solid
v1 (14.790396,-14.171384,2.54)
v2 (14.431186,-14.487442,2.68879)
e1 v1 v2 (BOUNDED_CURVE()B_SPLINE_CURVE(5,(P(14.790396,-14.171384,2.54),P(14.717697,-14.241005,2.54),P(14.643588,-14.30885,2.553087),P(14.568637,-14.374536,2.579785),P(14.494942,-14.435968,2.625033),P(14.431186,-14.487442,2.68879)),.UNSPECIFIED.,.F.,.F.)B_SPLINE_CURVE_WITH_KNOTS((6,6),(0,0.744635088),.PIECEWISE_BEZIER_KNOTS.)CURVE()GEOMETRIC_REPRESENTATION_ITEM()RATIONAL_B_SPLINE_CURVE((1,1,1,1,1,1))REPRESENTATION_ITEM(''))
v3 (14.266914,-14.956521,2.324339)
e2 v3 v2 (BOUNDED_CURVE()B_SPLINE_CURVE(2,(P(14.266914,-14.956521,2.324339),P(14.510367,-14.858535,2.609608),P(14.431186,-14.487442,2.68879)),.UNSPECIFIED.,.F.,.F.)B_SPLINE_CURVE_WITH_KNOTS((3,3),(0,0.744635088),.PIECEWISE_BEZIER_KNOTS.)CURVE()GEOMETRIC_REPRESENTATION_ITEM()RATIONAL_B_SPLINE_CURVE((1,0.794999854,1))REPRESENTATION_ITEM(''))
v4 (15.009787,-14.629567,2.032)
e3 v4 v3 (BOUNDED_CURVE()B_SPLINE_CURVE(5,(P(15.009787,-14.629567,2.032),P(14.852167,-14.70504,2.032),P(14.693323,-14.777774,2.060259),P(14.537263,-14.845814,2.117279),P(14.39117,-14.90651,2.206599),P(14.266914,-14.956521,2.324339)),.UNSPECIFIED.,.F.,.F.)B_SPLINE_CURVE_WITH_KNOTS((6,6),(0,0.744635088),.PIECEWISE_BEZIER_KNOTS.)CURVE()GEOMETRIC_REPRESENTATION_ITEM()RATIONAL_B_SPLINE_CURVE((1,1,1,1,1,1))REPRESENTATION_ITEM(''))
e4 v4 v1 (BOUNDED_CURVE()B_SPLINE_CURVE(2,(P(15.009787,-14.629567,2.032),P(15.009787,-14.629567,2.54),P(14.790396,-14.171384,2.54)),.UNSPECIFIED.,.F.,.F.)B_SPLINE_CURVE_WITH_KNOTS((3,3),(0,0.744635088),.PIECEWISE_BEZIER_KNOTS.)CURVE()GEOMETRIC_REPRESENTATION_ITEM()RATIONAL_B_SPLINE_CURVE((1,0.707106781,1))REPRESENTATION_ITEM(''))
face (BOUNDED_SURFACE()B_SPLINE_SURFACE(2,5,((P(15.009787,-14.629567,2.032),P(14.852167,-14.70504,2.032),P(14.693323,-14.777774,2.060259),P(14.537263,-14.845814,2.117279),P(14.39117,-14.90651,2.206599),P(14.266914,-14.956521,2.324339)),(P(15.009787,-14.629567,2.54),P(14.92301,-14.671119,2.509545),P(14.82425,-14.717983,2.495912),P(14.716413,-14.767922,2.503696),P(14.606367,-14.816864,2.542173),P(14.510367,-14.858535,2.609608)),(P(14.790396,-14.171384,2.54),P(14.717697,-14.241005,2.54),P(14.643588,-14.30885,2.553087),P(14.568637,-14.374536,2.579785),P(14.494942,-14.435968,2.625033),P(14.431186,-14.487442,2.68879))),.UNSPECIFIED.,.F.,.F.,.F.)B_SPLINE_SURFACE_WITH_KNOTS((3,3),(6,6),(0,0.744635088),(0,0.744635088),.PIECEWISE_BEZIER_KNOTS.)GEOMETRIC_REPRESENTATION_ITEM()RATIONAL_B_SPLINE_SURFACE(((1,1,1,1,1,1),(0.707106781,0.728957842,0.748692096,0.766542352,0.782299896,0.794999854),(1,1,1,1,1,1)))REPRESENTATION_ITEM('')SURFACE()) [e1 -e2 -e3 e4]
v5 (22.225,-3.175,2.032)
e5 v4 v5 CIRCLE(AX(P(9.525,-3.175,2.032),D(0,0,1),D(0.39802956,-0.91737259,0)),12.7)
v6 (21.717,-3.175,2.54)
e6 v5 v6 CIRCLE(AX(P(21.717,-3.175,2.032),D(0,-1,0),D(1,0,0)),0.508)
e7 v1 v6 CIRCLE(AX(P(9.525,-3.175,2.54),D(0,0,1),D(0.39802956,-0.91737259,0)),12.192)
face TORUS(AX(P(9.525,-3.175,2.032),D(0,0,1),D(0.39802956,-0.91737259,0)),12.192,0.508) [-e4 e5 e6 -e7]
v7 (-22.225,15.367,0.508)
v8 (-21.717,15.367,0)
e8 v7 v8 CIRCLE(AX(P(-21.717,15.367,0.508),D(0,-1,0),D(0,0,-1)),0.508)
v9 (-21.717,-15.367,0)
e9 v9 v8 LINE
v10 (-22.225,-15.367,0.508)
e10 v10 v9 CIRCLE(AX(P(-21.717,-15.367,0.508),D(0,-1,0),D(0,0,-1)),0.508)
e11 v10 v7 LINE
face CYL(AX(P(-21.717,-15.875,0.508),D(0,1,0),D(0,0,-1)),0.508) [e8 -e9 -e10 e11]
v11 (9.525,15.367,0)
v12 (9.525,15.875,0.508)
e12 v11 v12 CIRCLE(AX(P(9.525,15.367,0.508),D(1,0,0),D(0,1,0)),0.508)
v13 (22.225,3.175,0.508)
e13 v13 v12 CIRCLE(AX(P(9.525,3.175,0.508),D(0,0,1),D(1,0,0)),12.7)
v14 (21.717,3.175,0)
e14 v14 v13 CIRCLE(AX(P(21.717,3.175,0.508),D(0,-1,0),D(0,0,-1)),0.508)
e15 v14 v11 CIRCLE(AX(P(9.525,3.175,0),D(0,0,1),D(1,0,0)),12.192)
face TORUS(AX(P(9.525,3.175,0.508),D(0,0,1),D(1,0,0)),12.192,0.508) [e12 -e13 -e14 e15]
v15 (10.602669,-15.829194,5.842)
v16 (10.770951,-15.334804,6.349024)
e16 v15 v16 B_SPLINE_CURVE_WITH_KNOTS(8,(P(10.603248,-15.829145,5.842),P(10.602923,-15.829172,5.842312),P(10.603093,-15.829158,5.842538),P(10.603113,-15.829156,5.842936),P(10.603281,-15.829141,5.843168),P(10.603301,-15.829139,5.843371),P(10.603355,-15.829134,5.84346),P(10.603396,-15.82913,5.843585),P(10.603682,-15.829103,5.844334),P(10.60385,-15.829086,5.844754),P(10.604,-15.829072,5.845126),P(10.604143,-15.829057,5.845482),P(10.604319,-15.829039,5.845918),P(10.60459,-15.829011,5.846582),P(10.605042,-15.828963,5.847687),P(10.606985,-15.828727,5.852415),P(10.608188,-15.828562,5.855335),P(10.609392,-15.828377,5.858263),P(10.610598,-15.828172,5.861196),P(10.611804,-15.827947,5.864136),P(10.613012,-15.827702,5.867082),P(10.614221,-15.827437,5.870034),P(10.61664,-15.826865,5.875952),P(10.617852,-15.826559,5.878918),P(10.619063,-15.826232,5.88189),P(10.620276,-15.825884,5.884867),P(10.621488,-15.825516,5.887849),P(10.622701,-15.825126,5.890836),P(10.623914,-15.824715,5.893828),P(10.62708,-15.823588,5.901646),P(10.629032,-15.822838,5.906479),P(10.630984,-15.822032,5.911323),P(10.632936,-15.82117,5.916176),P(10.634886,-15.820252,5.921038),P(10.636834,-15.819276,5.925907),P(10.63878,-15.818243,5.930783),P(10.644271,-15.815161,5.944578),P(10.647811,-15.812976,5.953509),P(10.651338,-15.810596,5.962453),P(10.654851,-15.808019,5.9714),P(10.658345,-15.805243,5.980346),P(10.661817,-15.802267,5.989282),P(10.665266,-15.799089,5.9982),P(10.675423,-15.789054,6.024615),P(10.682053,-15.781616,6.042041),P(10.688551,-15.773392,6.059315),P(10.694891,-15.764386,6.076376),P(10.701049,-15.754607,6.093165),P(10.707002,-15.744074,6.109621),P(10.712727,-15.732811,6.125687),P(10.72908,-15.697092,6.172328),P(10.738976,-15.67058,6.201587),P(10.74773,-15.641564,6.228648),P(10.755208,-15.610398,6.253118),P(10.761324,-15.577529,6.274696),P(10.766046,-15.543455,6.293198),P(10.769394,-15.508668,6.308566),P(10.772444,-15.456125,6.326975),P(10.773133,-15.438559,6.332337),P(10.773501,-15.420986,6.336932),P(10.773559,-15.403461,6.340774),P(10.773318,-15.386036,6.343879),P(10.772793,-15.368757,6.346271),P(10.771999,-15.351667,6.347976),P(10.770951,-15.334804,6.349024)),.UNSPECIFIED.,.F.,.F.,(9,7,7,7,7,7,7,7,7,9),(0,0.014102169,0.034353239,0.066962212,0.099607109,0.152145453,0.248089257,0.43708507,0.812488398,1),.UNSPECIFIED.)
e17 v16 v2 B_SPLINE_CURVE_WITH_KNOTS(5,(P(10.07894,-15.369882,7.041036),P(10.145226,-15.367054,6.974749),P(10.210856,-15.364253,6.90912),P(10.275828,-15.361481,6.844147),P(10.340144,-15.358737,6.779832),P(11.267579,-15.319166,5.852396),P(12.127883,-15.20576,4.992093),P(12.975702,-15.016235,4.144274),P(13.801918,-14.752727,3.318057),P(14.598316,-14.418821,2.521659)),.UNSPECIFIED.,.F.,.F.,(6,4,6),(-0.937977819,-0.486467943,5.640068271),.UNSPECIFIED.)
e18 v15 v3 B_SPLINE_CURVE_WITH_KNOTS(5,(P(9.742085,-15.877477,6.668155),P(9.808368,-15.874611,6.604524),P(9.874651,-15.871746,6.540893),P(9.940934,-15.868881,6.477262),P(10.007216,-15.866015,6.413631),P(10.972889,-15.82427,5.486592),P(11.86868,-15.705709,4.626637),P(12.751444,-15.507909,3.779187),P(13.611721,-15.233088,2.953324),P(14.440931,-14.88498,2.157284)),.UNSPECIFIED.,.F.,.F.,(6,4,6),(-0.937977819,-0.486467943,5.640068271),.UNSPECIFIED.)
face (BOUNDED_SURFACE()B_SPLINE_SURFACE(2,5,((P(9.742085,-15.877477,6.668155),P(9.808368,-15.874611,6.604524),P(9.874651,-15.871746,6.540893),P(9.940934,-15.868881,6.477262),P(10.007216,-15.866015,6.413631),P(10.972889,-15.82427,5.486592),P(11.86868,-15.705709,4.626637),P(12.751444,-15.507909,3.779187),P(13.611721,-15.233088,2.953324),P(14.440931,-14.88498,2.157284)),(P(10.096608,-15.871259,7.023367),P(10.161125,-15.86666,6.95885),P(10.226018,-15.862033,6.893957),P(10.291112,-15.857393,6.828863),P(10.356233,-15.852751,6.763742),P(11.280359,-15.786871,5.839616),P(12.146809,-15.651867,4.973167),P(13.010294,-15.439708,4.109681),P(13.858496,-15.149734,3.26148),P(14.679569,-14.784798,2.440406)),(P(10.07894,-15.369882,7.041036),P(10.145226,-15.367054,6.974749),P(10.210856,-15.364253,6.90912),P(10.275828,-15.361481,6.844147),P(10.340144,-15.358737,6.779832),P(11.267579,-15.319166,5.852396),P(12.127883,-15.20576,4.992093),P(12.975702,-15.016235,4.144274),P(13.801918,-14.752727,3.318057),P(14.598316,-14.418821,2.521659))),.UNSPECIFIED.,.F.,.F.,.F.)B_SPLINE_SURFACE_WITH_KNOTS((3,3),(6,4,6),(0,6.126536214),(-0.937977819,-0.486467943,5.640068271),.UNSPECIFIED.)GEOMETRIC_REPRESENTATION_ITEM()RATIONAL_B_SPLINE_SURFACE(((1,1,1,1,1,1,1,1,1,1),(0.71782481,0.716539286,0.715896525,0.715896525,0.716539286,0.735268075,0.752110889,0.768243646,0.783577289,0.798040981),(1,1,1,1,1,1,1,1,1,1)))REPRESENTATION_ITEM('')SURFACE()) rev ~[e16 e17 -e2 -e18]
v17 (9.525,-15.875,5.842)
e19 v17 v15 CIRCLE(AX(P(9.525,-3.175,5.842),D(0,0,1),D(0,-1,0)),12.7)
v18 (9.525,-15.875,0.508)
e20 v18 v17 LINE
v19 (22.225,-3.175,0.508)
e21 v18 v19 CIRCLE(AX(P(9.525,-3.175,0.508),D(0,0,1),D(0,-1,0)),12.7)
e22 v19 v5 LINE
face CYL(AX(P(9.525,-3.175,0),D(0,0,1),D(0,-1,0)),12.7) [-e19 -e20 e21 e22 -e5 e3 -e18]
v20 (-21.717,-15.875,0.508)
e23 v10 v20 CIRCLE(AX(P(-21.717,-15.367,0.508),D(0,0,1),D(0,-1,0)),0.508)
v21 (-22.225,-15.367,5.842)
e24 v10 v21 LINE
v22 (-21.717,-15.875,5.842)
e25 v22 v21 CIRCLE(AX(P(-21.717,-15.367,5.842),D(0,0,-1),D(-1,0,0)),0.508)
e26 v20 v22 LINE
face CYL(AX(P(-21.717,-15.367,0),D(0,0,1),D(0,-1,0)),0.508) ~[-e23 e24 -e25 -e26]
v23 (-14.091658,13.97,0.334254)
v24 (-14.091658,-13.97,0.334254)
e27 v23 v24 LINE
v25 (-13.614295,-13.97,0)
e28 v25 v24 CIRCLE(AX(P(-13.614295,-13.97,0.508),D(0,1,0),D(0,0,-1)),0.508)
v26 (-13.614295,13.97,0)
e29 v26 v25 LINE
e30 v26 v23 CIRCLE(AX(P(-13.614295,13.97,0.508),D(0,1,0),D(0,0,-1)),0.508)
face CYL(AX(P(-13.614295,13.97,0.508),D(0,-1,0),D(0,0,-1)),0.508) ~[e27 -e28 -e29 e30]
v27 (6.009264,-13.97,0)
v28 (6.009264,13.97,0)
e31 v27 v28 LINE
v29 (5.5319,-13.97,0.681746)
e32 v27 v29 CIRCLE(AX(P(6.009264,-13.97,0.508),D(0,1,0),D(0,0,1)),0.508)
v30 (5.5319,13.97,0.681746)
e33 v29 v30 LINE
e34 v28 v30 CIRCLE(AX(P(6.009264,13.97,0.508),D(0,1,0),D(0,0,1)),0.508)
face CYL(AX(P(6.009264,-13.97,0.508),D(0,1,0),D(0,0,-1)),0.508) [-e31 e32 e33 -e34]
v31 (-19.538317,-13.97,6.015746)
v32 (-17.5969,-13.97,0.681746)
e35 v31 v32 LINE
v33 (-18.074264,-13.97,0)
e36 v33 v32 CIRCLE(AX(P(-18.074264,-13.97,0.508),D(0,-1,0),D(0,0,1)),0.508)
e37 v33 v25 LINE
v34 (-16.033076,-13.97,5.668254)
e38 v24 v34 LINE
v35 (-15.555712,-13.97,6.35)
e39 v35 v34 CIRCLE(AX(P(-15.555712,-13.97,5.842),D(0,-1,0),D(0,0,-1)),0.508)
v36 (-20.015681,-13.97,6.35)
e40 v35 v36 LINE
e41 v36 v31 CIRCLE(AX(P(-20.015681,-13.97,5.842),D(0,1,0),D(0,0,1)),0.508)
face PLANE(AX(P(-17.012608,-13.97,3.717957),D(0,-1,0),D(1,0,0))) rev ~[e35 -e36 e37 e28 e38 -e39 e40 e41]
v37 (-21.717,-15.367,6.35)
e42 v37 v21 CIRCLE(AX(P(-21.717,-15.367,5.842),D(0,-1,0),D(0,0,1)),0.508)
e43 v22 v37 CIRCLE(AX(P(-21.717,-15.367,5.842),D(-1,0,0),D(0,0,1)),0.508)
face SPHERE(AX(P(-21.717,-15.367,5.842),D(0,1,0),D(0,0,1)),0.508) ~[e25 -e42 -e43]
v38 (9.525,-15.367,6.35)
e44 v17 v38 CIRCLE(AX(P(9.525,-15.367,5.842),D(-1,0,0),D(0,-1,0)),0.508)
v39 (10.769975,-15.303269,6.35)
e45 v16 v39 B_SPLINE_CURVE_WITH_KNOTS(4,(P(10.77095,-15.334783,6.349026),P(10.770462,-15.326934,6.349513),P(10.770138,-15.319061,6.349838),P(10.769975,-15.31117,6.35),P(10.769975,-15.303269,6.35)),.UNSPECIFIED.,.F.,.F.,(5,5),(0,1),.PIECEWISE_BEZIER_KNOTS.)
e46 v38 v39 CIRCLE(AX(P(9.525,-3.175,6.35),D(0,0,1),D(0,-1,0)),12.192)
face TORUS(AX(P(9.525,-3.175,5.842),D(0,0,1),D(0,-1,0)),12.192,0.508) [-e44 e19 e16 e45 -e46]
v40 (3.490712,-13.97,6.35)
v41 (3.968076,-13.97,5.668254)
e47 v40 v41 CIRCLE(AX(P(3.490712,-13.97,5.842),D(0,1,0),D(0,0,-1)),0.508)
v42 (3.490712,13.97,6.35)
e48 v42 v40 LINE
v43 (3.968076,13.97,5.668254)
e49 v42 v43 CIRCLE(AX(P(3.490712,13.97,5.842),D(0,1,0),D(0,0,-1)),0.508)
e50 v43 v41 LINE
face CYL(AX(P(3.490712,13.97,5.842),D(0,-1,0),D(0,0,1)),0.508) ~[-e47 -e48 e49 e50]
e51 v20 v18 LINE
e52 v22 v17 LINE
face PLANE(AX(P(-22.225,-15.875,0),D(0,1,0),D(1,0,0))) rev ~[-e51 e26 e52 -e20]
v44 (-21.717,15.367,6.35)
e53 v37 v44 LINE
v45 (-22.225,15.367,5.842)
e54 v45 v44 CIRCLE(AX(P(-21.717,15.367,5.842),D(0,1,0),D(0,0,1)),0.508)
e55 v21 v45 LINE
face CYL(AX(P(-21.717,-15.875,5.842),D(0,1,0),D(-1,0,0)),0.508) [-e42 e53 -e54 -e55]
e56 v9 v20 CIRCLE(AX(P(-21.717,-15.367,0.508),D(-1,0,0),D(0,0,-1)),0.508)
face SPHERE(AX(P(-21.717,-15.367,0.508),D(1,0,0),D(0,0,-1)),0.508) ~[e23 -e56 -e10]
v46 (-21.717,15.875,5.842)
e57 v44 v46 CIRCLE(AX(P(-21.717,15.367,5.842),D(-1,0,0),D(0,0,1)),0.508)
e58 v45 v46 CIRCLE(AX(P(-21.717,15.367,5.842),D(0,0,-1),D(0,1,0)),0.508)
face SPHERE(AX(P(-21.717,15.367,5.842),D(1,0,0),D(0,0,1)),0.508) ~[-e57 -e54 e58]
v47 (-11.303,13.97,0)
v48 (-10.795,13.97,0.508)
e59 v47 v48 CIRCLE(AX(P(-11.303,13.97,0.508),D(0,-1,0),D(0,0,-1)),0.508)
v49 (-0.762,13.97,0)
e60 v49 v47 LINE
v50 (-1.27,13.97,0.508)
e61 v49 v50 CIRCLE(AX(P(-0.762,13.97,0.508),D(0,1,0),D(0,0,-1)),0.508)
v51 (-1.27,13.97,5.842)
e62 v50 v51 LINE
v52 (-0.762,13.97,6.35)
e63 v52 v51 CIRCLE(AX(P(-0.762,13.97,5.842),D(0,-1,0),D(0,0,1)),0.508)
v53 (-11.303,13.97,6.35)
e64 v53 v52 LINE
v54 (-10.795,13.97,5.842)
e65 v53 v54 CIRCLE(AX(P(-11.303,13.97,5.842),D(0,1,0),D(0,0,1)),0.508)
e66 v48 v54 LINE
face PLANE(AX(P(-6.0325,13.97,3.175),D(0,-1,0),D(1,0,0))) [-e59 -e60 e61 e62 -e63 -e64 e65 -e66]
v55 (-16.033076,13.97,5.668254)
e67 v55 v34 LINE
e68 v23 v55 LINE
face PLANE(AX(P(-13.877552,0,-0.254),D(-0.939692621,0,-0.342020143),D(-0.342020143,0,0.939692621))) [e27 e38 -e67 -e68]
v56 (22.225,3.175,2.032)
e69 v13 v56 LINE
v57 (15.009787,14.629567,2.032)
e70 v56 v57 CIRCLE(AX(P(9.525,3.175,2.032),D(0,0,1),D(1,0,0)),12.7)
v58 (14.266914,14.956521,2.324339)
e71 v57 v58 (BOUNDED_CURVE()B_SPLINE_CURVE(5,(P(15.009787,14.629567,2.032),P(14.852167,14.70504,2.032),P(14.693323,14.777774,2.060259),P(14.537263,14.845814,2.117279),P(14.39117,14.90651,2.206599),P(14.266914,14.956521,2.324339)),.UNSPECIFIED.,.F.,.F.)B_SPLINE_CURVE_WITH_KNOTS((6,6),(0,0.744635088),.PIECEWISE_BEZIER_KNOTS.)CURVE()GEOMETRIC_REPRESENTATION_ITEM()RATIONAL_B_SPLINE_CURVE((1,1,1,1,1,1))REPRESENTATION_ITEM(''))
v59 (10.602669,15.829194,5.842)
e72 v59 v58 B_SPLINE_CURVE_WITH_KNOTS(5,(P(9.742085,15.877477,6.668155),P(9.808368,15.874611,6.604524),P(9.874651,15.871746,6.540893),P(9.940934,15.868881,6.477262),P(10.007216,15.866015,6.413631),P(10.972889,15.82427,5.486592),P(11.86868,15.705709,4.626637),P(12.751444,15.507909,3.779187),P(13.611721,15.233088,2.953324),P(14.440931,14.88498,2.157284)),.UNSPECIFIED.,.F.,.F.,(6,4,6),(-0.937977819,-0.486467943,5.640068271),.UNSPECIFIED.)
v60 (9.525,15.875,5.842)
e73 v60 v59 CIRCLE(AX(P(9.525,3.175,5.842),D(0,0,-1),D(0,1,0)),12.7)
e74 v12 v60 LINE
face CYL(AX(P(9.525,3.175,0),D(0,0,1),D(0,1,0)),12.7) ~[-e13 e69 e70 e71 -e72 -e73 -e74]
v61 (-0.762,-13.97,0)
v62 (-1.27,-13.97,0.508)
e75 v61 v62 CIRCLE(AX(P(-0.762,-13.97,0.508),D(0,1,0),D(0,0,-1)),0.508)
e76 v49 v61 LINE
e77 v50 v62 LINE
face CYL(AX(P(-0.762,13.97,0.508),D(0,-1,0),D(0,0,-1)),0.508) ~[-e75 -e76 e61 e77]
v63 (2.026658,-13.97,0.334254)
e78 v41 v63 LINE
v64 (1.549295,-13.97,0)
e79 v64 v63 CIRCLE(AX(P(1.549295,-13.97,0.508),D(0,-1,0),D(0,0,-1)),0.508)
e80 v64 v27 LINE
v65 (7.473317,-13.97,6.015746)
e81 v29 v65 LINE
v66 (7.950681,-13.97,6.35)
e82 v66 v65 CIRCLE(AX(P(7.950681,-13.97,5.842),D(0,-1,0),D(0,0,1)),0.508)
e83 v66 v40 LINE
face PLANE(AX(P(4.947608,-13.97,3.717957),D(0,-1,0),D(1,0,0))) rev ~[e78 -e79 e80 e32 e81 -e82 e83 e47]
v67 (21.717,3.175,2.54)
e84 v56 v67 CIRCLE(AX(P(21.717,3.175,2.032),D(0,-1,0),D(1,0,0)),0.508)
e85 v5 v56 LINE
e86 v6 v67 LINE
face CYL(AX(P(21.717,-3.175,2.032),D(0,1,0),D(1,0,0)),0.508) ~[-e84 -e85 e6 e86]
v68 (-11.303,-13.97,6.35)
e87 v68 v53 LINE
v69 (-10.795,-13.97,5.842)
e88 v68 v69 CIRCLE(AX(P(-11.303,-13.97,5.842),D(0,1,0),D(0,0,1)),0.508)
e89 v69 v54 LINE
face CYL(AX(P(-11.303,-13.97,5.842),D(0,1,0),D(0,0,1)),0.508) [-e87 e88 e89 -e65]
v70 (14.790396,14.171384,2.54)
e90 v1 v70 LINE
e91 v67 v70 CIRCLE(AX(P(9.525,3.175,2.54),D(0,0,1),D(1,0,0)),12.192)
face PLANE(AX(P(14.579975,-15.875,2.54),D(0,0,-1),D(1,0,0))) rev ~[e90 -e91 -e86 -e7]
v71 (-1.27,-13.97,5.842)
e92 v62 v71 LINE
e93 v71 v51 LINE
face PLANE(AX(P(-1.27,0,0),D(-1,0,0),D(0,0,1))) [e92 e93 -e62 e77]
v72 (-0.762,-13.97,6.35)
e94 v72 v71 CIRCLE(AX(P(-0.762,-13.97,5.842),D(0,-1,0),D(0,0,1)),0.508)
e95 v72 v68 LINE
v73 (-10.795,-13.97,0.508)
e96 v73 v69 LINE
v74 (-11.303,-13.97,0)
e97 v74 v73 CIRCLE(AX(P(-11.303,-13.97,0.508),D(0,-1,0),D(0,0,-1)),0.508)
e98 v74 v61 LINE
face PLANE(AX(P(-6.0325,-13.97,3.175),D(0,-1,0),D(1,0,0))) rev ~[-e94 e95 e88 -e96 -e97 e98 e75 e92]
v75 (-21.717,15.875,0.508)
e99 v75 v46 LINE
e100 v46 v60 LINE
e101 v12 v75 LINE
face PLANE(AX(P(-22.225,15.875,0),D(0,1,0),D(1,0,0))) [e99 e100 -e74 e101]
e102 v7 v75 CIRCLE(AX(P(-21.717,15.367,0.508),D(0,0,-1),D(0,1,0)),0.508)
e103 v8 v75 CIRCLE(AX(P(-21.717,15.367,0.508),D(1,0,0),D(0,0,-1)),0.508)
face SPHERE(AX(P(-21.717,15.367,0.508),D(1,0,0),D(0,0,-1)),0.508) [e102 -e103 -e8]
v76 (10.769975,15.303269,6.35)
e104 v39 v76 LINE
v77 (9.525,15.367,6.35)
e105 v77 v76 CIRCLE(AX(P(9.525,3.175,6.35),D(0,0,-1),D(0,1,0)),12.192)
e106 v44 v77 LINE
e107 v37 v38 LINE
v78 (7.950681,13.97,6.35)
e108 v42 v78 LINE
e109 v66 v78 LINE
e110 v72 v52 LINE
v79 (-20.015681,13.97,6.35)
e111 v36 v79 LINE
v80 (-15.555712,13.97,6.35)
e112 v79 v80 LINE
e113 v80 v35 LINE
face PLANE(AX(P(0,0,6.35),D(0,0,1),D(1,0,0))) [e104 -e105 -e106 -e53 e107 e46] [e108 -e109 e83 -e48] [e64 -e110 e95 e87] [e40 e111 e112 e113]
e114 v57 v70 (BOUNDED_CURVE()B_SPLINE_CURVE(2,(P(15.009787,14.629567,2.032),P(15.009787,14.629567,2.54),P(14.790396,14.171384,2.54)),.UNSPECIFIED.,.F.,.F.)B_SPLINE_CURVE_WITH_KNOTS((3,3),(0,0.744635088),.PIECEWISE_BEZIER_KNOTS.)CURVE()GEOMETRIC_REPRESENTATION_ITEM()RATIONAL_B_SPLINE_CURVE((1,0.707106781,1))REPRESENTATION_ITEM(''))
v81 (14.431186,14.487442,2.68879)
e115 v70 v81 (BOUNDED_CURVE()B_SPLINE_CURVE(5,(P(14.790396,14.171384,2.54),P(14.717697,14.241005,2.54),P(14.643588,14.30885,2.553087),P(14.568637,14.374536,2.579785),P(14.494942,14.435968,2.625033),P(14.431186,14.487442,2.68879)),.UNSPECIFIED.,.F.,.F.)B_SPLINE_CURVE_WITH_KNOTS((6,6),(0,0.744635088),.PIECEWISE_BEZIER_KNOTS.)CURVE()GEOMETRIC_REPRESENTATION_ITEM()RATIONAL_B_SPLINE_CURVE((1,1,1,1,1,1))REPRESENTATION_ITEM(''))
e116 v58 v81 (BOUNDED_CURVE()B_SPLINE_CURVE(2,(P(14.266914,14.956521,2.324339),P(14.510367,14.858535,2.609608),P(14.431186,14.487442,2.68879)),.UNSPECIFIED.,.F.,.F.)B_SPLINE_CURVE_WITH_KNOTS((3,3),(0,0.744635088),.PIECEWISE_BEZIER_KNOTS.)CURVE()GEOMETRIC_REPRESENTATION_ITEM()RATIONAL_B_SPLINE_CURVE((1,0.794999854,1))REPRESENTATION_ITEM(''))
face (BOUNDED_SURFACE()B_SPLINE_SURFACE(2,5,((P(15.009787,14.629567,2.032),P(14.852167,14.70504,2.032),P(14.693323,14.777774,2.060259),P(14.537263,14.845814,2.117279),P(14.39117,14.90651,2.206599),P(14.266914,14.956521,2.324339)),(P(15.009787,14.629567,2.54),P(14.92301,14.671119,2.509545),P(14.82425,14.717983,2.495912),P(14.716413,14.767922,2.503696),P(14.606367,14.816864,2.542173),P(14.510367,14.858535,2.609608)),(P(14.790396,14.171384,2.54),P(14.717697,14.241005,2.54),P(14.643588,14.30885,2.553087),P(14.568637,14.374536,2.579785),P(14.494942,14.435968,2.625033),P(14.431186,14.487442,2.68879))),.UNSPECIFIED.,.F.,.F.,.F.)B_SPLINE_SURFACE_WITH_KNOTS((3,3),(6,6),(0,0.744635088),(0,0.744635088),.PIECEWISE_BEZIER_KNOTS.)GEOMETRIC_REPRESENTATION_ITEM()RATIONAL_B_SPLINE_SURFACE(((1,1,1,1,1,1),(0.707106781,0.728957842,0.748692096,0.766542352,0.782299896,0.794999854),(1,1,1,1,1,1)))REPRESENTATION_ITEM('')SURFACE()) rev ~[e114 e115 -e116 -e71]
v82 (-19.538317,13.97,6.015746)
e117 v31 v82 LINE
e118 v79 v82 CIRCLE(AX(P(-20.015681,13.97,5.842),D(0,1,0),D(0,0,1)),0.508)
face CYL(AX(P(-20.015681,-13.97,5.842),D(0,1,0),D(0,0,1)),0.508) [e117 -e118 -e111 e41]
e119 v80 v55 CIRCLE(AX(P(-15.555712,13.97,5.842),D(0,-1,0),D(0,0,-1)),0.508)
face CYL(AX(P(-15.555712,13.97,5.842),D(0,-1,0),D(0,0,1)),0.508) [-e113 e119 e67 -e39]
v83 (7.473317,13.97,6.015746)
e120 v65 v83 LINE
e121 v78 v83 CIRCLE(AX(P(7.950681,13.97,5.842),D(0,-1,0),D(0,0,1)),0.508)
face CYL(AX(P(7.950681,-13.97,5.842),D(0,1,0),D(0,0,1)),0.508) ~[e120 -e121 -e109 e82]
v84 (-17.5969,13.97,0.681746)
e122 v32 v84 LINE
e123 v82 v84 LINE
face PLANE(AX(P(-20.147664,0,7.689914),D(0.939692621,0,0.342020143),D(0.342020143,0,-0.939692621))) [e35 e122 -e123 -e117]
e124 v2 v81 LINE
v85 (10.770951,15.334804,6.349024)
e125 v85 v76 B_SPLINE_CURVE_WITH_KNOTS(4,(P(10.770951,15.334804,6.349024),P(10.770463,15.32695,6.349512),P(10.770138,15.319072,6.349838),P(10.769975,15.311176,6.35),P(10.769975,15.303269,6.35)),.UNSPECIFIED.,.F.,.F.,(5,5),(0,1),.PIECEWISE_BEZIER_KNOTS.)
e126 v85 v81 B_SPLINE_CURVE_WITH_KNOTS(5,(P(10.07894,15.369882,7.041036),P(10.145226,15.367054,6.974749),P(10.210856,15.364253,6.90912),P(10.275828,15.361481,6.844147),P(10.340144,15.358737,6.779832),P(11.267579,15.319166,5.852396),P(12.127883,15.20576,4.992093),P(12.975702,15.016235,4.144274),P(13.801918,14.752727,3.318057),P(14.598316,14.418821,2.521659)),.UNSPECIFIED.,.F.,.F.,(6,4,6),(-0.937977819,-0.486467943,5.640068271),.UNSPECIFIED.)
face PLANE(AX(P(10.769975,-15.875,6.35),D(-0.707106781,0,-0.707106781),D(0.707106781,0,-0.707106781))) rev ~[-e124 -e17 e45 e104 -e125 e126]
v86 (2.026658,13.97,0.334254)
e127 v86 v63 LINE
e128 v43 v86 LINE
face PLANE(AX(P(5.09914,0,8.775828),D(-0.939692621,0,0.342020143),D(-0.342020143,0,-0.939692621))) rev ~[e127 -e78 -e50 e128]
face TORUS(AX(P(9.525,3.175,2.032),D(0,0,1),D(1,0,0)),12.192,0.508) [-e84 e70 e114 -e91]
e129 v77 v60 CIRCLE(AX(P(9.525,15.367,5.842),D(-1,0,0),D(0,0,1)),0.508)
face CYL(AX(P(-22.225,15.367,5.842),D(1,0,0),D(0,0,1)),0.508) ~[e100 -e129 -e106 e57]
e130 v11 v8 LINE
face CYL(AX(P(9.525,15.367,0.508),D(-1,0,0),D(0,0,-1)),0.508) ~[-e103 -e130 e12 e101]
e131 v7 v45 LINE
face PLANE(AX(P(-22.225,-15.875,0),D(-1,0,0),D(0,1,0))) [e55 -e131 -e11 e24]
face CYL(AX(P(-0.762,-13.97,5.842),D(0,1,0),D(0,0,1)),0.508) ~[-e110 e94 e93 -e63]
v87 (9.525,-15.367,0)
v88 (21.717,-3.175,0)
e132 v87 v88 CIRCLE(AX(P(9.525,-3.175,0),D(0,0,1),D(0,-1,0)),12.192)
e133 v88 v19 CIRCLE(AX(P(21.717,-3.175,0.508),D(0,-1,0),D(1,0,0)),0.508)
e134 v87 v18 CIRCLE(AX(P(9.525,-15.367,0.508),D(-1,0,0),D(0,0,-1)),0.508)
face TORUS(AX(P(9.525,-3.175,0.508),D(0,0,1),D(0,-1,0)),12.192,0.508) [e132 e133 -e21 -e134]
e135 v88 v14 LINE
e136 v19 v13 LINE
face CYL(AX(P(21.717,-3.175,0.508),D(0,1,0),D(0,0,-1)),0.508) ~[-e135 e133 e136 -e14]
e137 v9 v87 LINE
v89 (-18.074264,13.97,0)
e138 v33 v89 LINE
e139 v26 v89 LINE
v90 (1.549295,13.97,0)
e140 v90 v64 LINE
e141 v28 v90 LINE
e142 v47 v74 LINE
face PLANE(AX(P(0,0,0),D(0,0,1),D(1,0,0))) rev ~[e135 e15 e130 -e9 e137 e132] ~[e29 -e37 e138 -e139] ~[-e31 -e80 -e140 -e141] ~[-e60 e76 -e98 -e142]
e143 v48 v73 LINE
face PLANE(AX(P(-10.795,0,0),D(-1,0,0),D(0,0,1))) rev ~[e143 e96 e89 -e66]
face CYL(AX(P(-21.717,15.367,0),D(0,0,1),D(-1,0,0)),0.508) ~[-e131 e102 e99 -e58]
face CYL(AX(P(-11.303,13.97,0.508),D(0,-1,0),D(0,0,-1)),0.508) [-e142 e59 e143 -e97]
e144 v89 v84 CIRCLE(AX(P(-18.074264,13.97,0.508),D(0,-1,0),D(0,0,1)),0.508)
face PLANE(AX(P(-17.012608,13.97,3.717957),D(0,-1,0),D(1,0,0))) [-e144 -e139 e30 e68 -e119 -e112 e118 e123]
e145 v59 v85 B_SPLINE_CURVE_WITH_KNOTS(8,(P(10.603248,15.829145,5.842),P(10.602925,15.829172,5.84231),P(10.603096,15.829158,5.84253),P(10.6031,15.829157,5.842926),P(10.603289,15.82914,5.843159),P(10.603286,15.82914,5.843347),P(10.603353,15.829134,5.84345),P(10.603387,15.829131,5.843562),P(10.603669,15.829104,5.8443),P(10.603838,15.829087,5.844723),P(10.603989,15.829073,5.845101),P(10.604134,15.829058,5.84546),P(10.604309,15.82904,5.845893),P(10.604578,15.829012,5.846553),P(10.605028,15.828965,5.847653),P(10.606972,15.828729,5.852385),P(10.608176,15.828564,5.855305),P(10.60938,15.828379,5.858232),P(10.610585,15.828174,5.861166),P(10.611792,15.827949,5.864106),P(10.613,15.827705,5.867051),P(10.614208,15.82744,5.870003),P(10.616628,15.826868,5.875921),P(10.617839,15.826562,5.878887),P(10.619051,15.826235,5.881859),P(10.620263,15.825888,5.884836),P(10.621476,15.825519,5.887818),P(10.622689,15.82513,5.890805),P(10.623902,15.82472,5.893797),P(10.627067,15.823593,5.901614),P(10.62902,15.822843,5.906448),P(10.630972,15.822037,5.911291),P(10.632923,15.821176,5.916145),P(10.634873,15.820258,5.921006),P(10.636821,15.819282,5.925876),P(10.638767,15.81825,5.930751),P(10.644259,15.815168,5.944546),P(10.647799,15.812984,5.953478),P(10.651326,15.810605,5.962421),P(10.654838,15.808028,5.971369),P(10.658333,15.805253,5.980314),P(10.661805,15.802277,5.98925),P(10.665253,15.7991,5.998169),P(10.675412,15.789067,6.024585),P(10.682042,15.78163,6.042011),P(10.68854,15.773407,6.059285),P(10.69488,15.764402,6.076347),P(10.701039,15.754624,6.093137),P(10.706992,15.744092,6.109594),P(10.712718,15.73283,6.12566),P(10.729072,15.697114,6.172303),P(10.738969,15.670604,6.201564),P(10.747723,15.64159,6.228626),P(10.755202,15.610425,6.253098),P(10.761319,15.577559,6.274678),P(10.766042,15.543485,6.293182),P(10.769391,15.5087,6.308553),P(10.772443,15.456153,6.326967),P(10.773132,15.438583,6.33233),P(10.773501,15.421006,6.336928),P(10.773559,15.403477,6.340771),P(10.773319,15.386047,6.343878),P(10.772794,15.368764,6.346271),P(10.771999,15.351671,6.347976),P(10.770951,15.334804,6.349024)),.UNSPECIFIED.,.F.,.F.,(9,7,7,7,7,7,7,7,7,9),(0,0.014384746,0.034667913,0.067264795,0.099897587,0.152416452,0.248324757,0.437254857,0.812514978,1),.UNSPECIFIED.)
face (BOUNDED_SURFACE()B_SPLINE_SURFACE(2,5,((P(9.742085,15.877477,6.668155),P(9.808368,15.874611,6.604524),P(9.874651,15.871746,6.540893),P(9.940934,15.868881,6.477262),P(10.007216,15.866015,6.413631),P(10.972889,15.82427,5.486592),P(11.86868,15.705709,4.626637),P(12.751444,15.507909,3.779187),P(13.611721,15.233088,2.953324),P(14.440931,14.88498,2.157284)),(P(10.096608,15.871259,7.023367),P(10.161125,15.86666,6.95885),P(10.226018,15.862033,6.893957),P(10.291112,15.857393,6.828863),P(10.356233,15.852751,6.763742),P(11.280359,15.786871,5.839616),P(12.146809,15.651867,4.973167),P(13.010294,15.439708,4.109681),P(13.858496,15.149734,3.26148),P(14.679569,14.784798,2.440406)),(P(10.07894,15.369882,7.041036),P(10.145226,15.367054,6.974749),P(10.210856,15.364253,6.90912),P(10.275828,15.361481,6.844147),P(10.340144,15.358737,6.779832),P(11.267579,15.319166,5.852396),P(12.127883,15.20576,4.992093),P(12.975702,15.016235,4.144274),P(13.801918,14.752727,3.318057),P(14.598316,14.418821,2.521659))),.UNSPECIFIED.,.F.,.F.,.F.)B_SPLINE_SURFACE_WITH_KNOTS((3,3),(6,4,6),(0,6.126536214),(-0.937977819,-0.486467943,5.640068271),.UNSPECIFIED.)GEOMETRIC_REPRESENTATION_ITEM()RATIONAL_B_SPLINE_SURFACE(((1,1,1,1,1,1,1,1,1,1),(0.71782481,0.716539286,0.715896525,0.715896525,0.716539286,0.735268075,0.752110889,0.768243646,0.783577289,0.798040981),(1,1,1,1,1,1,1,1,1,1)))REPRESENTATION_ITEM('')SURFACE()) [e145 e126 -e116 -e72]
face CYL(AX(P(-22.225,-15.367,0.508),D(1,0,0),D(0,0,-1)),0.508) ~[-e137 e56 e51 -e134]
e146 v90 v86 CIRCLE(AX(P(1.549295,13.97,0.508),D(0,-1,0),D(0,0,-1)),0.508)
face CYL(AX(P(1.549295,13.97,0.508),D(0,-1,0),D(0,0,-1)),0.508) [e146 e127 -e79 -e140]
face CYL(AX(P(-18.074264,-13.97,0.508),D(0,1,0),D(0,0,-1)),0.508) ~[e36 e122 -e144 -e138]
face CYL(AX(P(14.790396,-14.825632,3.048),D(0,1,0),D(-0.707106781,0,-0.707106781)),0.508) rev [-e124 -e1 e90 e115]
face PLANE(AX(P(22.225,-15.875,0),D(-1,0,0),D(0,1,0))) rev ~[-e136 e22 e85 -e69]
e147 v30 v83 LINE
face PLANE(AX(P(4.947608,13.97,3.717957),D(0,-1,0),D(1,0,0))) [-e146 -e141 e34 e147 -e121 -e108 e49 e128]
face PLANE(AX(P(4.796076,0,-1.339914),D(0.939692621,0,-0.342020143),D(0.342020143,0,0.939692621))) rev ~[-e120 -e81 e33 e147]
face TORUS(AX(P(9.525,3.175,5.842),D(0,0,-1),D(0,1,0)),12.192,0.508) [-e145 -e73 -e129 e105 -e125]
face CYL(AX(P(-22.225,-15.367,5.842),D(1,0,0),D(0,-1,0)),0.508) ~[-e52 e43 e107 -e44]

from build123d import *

# Parameters (mm, degrees)
F0_W     = 44.45
F0_H     = 31.75
F1_DEPTH = 6.35
F2_W     = 9.525
F2_H     = 6.35
F3_DEPTH = 13.97
F5_DEPTH = 31.751
F6_R     = 12.7
F7_R     = 0.508


with BuildPart() as f1:
    # F0 (on Top) → F1 (new body)
    with BuildSketch(Plane.XY):
        Rectangle(F0_W, F0_H)
    extrude(amount=F1_DEPTH)

    # F2 (on Front) → F3 (cut, symmetric)
    with BuildSketch(Plane.XZ):
        with Locations((-6.0325, 3.175)):
            Rectangle(F2_W, F2_H)
        Polygon((-17.1641401403, 8.7758279101), (-20.1476642113, 7.6899139551), (-16.8610756315, -1.3399139551), (-13.8775515605, -0.254), align=None)
        Polygon((1.8125515605, -0.254), (4.7960756315, -1.3399139551), (8.0826642113, 7.6899139551), (5.0991401403, 8.7758279101), align=None)
    extrude(amount=F3_DEPTH, both=True, mode=Mode.SUBTRACT)

    # F4 (on face) → F5 (cut, through all)
    with BuildSketch(Plane.XZ.offset(15.875)):
        Polygon((22.225, 6.35), (10.7699754152, 6.35), (14.5799754152, 2.54), (22.225, 2.54), align=None)
    extrude(amount=-F5_DEPTH, mode=Mode.SUBTRACT)

    # F6
    f6_edges = [f1.edges().sort_by_distance(p)[0] for p in [
        (22.225, -15.875, 1.27),
        (22.225, 15.875, 1.27),
    ]]
    fillet(f6_edges, radius=F6_R)

    # F7
    f7_edges = [f1.edges().sort_by_distance(p)[0] for p in [
        (-16.281211, 0, 6.35),
        (-19.659975, 0, 6.35),
        (-17.348764, 0, 0),
        (-10.795, 0, 6.35),
        (-1.27, 0, 6.35),
        (4.216211, 0, 6.35),
        (-13.97, 0, 0),
        (-10.795, 0, 0),
        (-1.27, 0, 0),
        (1.905, 0, 0),
        (5.283764, 0, 0),
        (7.594975, 0, 6.35),
        (14.579975, 0, 2.54),
        (20.143102, -10.142489, 2.54),
        (18.505256, -12.155256, 0),
        (-22.225, 0, 0),
        (-6.35, 15.875, 6.35),
        (-22.225, 0, 6.35),
        (-6.35, -15.875, 6.35),
        (-22.225, -15.875, 3.175),
        (-22.225, 15.875, 3.175),
        (-6.35, 15.875, 0),
        (18.505256, 12.155256, 0),
        (22.225, 0, 0),
        (-6.35, -15.875, 0),
        (10.148239, 15.859698, 6.35),
        (12.713492, 15.468231, 4.406484),
        (20.143102, 10.142489, 2.54),
        (10.148239, -15.859698, 6.35),
        (22.225, 0, 2.54),
        (12.713492, -15.468231, 4.406484),
    ]]
    fillet(f7_edges, radius=F7_R)


solid = f1.part
